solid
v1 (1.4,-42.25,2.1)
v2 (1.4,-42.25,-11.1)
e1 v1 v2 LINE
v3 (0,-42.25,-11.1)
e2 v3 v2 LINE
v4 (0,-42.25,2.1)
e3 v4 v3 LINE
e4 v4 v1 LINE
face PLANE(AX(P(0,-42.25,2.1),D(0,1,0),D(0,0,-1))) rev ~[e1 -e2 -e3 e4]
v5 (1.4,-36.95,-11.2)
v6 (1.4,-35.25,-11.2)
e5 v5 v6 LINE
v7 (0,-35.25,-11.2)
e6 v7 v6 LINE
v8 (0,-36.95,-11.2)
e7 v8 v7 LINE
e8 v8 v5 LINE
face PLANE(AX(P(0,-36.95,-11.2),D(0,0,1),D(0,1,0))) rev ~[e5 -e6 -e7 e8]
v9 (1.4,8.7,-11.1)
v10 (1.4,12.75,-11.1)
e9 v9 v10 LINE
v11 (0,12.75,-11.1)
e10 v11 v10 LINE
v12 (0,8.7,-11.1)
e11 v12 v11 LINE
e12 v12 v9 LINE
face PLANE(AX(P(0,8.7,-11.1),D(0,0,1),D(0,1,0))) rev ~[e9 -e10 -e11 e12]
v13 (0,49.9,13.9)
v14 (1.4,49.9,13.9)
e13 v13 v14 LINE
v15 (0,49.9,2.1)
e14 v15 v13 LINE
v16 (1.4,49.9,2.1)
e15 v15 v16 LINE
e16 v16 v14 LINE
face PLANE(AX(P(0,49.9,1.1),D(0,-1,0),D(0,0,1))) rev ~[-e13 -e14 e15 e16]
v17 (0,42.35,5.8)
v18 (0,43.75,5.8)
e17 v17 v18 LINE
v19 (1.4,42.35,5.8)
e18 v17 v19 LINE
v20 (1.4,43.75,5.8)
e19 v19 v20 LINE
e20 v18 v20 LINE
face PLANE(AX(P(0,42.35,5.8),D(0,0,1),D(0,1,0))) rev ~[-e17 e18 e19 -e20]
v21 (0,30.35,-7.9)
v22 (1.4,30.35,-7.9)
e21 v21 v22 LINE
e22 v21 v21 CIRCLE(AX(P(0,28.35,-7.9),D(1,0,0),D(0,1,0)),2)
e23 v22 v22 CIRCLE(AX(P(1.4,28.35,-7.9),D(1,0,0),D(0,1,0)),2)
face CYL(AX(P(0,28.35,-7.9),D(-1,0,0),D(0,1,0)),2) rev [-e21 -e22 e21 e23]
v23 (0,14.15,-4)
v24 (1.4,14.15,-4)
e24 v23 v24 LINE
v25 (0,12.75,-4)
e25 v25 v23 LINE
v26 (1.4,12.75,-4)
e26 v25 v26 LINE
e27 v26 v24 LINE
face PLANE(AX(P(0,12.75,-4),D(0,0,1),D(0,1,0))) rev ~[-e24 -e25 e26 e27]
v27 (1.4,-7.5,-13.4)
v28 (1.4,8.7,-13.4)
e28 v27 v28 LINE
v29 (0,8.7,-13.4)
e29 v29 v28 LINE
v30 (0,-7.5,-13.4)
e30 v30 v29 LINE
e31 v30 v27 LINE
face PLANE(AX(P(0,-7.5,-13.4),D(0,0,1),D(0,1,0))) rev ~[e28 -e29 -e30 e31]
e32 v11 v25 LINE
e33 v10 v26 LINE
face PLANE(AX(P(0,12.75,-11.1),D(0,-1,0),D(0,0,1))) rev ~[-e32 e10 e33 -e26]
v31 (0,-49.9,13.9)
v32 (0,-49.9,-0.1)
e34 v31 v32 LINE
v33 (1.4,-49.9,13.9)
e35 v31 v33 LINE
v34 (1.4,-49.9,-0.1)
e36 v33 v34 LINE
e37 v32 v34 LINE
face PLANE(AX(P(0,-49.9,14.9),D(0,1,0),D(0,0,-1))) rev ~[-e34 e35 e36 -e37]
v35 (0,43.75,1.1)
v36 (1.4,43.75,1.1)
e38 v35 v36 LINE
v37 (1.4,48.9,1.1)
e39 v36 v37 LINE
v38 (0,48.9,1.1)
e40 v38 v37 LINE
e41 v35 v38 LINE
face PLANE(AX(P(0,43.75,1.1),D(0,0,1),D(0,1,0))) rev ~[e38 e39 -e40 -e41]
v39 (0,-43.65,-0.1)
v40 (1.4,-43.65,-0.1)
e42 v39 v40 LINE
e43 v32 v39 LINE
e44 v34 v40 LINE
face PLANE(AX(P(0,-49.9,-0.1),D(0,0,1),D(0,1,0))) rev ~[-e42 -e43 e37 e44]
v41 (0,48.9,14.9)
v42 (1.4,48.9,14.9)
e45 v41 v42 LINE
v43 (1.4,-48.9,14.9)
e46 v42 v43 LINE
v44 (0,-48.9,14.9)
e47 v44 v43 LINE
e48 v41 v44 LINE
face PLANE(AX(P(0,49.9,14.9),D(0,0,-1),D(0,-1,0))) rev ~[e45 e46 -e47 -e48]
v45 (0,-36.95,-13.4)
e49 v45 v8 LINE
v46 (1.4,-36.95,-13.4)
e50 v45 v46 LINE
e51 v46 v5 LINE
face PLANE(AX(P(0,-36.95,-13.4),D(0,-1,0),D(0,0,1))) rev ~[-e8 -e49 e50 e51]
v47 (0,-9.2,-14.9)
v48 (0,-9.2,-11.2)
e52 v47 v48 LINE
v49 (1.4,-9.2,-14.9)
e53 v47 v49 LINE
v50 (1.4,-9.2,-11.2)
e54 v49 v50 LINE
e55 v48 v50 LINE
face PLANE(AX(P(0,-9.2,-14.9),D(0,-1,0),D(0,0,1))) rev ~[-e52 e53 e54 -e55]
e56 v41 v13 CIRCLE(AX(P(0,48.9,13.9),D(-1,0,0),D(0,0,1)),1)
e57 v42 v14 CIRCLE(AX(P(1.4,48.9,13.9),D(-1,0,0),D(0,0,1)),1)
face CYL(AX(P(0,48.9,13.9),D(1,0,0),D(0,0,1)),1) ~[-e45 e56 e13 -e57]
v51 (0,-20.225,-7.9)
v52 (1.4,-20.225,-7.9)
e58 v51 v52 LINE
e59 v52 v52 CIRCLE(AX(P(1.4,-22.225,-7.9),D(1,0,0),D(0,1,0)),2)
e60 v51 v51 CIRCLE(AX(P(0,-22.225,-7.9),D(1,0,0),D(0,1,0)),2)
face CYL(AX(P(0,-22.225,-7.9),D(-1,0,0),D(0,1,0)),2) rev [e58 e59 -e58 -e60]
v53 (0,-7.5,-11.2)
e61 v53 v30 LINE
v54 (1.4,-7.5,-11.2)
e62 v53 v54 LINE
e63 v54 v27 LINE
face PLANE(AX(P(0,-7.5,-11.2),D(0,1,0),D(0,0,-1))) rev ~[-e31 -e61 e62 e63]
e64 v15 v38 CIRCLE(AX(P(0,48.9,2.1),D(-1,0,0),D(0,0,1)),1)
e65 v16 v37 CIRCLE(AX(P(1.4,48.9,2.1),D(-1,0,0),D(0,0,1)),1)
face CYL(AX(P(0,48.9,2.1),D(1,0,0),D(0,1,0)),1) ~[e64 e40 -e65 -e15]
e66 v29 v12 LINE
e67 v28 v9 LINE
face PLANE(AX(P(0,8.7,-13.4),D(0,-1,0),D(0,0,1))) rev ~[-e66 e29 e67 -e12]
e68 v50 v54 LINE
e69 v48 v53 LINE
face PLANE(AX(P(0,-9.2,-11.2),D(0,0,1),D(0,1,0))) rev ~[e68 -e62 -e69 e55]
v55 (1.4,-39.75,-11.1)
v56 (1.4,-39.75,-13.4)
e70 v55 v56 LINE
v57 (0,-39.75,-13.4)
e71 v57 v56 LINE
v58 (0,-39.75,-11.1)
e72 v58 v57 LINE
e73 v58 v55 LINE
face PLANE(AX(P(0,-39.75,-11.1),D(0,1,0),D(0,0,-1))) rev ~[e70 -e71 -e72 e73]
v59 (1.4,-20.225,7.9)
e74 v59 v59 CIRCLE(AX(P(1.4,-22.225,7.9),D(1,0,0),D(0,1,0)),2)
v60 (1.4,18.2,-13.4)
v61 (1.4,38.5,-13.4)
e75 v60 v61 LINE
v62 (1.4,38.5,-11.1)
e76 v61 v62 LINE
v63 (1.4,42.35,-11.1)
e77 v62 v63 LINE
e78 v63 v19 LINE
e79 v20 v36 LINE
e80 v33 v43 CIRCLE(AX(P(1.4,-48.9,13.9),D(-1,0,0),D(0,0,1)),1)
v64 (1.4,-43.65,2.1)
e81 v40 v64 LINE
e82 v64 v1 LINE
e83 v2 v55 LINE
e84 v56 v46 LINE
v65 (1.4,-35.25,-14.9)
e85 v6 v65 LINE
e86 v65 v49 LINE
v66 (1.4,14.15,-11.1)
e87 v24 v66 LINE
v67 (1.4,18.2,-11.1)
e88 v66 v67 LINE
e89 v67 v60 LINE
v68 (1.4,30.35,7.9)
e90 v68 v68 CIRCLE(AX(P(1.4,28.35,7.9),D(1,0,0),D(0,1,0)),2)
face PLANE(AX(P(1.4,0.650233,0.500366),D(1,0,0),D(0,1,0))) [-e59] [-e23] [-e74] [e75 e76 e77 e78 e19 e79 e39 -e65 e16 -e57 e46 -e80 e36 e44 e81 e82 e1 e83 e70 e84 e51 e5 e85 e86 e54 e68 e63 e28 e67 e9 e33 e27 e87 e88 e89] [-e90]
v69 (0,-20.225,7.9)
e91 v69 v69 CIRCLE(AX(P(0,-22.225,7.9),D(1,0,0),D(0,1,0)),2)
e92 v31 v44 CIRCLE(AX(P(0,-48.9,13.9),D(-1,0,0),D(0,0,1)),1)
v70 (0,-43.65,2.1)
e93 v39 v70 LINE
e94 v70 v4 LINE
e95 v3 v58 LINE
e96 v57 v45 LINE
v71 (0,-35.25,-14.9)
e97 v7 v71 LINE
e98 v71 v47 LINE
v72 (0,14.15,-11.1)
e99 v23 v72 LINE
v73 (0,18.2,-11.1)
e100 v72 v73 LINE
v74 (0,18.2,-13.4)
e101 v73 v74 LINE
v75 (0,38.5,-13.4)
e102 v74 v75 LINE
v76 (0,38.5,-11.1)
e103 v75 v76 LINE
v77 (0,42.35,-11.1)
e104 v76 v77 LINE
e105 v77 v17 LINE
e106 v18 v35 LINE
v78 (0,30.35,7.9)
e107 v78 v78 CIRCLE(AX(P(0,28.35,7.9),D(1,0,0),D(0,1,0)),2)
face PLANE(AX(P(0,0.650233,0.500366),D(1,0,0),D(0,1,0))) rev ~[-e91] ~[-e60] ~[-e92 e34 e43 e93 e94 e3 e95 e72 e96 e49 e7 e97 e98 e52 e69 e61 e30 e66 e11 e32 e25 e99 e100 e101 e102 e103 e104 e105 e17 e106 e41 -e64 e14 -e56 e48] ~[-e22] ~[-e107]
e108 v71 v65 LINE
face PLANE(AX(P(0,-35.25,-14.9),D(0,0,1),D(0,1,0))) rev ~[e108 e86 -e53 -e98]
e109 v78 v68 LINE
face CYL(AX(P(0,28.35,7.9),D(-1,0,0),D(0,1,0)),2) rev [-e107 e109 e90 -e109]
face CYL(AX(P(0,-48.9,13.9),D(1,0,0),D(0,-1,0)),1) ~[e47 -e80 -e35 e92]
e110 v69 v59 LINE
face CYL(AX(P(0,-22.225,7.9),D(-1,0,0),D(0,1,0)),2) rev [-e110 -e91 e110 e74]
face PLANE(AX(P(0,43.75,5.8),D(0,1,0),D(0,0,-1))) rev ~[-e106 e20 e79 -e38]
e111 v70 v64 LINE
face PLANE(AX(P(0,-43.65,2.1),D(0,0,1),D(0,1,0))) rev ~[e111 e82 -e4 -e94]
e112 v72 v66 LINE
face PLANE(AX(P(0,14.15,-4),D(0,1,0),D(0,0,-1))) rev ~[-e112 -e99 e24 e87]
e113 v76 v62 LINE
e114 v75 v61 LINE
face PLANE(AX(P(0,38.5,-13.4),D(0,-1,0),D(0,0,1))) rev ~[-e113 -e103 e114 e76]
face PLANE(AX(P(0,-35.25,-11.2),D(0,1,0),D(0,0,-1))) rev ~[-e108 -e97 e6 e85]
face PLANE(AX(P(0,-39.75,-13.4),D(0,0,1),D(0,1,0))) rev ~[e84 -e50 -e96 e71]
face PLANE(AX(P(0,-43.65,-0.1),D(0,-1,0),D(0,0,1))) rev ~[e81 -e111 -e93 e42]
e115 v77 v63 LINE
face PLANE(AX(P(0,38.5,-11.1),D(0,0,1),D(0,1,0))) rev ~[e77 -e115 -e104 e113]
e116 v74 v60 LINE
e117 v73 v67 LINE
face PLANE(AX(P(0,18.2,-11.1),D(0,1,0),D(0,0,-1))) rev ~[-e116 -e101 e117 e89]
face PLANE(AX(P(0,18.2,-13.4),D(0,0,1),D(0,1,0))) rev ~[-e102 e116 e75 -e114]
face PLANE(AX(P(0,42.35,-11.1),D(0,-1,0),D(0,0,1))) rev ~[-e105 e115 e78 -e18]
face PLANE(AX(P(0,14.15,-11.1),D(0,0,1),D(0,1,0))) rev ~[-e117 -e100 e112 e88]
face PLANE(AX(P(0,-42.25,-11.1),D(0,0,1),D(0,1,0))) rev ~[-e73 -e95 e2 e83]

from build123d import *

# Parameters (mm, degrees)
F0_R     = 2
F1_DEPTH = 1.4
F2_R     = 1


with BuildPart() as f1:
    # F0 (on Right) → F1 (new body)
    with BuildSketch(Plane.YZ):
        Polygon((-35.25, -14.9), (-9.2, -14.9), (-9.2, -13.4), (-9.2, -11.2), (-7.5, -11.2), (-7.5, -13.4), (8.7, -13.4), (8.7, -11.1), (12.75, -11.1), (12.75, -4), (14.15, -4), (14.15, -11.1), (18.2, -11.1), (18.2, -13.4), (38.5, -13.4), (38.5, -11.1), (42.35, -11.1), (42.35, 5.8), (43.75, 5.8), (43.75, 1.1), (49.9, 1.1), (49.9, 14.9), (-49.9, 14.9), (-49.9, 6.4402827993), (-49.9, 2.1), (-49.9, -0.1), (-43.65, -0.1), (-43.65, 2.1), (-42.25, 2.1), (-42.25, -11.1), (-39.75, -11.1), (-39.75, -13.4), (-36.95, -13.4), (-36.95, -11.2), (-35.25, -11.2), (-35.25, -13.4), align=None)
        with Locations((-22.225, -7.9)):
            Circle(F0_R, mode=Mode.SUBTRACT)
        with Locations((28.35, -7.9)):
            Circle(F0_R, mode=Mode.SUBTRACT)
        with Locations((-22.225, 7.9)):
            Circle(F0_R, mode=Mode.SUBTRACT)
        with Locations((28.35, 7.9)):
            Circle(F0_R, mode=Mode.SUBTRACT)
    extrude(amount=F1_DEPTH)

    # F2
    f2_edges = [f1.edges().sort_by_distance(p)[0] for p in [
        (0.7, -49.9, 14.9),
        (0.7, 49.9, 14.9),
        (0.7, 49.9, 1.1),
    ]]
    fillet(f2_edges, radius=F2_R)


solid = f1.part
